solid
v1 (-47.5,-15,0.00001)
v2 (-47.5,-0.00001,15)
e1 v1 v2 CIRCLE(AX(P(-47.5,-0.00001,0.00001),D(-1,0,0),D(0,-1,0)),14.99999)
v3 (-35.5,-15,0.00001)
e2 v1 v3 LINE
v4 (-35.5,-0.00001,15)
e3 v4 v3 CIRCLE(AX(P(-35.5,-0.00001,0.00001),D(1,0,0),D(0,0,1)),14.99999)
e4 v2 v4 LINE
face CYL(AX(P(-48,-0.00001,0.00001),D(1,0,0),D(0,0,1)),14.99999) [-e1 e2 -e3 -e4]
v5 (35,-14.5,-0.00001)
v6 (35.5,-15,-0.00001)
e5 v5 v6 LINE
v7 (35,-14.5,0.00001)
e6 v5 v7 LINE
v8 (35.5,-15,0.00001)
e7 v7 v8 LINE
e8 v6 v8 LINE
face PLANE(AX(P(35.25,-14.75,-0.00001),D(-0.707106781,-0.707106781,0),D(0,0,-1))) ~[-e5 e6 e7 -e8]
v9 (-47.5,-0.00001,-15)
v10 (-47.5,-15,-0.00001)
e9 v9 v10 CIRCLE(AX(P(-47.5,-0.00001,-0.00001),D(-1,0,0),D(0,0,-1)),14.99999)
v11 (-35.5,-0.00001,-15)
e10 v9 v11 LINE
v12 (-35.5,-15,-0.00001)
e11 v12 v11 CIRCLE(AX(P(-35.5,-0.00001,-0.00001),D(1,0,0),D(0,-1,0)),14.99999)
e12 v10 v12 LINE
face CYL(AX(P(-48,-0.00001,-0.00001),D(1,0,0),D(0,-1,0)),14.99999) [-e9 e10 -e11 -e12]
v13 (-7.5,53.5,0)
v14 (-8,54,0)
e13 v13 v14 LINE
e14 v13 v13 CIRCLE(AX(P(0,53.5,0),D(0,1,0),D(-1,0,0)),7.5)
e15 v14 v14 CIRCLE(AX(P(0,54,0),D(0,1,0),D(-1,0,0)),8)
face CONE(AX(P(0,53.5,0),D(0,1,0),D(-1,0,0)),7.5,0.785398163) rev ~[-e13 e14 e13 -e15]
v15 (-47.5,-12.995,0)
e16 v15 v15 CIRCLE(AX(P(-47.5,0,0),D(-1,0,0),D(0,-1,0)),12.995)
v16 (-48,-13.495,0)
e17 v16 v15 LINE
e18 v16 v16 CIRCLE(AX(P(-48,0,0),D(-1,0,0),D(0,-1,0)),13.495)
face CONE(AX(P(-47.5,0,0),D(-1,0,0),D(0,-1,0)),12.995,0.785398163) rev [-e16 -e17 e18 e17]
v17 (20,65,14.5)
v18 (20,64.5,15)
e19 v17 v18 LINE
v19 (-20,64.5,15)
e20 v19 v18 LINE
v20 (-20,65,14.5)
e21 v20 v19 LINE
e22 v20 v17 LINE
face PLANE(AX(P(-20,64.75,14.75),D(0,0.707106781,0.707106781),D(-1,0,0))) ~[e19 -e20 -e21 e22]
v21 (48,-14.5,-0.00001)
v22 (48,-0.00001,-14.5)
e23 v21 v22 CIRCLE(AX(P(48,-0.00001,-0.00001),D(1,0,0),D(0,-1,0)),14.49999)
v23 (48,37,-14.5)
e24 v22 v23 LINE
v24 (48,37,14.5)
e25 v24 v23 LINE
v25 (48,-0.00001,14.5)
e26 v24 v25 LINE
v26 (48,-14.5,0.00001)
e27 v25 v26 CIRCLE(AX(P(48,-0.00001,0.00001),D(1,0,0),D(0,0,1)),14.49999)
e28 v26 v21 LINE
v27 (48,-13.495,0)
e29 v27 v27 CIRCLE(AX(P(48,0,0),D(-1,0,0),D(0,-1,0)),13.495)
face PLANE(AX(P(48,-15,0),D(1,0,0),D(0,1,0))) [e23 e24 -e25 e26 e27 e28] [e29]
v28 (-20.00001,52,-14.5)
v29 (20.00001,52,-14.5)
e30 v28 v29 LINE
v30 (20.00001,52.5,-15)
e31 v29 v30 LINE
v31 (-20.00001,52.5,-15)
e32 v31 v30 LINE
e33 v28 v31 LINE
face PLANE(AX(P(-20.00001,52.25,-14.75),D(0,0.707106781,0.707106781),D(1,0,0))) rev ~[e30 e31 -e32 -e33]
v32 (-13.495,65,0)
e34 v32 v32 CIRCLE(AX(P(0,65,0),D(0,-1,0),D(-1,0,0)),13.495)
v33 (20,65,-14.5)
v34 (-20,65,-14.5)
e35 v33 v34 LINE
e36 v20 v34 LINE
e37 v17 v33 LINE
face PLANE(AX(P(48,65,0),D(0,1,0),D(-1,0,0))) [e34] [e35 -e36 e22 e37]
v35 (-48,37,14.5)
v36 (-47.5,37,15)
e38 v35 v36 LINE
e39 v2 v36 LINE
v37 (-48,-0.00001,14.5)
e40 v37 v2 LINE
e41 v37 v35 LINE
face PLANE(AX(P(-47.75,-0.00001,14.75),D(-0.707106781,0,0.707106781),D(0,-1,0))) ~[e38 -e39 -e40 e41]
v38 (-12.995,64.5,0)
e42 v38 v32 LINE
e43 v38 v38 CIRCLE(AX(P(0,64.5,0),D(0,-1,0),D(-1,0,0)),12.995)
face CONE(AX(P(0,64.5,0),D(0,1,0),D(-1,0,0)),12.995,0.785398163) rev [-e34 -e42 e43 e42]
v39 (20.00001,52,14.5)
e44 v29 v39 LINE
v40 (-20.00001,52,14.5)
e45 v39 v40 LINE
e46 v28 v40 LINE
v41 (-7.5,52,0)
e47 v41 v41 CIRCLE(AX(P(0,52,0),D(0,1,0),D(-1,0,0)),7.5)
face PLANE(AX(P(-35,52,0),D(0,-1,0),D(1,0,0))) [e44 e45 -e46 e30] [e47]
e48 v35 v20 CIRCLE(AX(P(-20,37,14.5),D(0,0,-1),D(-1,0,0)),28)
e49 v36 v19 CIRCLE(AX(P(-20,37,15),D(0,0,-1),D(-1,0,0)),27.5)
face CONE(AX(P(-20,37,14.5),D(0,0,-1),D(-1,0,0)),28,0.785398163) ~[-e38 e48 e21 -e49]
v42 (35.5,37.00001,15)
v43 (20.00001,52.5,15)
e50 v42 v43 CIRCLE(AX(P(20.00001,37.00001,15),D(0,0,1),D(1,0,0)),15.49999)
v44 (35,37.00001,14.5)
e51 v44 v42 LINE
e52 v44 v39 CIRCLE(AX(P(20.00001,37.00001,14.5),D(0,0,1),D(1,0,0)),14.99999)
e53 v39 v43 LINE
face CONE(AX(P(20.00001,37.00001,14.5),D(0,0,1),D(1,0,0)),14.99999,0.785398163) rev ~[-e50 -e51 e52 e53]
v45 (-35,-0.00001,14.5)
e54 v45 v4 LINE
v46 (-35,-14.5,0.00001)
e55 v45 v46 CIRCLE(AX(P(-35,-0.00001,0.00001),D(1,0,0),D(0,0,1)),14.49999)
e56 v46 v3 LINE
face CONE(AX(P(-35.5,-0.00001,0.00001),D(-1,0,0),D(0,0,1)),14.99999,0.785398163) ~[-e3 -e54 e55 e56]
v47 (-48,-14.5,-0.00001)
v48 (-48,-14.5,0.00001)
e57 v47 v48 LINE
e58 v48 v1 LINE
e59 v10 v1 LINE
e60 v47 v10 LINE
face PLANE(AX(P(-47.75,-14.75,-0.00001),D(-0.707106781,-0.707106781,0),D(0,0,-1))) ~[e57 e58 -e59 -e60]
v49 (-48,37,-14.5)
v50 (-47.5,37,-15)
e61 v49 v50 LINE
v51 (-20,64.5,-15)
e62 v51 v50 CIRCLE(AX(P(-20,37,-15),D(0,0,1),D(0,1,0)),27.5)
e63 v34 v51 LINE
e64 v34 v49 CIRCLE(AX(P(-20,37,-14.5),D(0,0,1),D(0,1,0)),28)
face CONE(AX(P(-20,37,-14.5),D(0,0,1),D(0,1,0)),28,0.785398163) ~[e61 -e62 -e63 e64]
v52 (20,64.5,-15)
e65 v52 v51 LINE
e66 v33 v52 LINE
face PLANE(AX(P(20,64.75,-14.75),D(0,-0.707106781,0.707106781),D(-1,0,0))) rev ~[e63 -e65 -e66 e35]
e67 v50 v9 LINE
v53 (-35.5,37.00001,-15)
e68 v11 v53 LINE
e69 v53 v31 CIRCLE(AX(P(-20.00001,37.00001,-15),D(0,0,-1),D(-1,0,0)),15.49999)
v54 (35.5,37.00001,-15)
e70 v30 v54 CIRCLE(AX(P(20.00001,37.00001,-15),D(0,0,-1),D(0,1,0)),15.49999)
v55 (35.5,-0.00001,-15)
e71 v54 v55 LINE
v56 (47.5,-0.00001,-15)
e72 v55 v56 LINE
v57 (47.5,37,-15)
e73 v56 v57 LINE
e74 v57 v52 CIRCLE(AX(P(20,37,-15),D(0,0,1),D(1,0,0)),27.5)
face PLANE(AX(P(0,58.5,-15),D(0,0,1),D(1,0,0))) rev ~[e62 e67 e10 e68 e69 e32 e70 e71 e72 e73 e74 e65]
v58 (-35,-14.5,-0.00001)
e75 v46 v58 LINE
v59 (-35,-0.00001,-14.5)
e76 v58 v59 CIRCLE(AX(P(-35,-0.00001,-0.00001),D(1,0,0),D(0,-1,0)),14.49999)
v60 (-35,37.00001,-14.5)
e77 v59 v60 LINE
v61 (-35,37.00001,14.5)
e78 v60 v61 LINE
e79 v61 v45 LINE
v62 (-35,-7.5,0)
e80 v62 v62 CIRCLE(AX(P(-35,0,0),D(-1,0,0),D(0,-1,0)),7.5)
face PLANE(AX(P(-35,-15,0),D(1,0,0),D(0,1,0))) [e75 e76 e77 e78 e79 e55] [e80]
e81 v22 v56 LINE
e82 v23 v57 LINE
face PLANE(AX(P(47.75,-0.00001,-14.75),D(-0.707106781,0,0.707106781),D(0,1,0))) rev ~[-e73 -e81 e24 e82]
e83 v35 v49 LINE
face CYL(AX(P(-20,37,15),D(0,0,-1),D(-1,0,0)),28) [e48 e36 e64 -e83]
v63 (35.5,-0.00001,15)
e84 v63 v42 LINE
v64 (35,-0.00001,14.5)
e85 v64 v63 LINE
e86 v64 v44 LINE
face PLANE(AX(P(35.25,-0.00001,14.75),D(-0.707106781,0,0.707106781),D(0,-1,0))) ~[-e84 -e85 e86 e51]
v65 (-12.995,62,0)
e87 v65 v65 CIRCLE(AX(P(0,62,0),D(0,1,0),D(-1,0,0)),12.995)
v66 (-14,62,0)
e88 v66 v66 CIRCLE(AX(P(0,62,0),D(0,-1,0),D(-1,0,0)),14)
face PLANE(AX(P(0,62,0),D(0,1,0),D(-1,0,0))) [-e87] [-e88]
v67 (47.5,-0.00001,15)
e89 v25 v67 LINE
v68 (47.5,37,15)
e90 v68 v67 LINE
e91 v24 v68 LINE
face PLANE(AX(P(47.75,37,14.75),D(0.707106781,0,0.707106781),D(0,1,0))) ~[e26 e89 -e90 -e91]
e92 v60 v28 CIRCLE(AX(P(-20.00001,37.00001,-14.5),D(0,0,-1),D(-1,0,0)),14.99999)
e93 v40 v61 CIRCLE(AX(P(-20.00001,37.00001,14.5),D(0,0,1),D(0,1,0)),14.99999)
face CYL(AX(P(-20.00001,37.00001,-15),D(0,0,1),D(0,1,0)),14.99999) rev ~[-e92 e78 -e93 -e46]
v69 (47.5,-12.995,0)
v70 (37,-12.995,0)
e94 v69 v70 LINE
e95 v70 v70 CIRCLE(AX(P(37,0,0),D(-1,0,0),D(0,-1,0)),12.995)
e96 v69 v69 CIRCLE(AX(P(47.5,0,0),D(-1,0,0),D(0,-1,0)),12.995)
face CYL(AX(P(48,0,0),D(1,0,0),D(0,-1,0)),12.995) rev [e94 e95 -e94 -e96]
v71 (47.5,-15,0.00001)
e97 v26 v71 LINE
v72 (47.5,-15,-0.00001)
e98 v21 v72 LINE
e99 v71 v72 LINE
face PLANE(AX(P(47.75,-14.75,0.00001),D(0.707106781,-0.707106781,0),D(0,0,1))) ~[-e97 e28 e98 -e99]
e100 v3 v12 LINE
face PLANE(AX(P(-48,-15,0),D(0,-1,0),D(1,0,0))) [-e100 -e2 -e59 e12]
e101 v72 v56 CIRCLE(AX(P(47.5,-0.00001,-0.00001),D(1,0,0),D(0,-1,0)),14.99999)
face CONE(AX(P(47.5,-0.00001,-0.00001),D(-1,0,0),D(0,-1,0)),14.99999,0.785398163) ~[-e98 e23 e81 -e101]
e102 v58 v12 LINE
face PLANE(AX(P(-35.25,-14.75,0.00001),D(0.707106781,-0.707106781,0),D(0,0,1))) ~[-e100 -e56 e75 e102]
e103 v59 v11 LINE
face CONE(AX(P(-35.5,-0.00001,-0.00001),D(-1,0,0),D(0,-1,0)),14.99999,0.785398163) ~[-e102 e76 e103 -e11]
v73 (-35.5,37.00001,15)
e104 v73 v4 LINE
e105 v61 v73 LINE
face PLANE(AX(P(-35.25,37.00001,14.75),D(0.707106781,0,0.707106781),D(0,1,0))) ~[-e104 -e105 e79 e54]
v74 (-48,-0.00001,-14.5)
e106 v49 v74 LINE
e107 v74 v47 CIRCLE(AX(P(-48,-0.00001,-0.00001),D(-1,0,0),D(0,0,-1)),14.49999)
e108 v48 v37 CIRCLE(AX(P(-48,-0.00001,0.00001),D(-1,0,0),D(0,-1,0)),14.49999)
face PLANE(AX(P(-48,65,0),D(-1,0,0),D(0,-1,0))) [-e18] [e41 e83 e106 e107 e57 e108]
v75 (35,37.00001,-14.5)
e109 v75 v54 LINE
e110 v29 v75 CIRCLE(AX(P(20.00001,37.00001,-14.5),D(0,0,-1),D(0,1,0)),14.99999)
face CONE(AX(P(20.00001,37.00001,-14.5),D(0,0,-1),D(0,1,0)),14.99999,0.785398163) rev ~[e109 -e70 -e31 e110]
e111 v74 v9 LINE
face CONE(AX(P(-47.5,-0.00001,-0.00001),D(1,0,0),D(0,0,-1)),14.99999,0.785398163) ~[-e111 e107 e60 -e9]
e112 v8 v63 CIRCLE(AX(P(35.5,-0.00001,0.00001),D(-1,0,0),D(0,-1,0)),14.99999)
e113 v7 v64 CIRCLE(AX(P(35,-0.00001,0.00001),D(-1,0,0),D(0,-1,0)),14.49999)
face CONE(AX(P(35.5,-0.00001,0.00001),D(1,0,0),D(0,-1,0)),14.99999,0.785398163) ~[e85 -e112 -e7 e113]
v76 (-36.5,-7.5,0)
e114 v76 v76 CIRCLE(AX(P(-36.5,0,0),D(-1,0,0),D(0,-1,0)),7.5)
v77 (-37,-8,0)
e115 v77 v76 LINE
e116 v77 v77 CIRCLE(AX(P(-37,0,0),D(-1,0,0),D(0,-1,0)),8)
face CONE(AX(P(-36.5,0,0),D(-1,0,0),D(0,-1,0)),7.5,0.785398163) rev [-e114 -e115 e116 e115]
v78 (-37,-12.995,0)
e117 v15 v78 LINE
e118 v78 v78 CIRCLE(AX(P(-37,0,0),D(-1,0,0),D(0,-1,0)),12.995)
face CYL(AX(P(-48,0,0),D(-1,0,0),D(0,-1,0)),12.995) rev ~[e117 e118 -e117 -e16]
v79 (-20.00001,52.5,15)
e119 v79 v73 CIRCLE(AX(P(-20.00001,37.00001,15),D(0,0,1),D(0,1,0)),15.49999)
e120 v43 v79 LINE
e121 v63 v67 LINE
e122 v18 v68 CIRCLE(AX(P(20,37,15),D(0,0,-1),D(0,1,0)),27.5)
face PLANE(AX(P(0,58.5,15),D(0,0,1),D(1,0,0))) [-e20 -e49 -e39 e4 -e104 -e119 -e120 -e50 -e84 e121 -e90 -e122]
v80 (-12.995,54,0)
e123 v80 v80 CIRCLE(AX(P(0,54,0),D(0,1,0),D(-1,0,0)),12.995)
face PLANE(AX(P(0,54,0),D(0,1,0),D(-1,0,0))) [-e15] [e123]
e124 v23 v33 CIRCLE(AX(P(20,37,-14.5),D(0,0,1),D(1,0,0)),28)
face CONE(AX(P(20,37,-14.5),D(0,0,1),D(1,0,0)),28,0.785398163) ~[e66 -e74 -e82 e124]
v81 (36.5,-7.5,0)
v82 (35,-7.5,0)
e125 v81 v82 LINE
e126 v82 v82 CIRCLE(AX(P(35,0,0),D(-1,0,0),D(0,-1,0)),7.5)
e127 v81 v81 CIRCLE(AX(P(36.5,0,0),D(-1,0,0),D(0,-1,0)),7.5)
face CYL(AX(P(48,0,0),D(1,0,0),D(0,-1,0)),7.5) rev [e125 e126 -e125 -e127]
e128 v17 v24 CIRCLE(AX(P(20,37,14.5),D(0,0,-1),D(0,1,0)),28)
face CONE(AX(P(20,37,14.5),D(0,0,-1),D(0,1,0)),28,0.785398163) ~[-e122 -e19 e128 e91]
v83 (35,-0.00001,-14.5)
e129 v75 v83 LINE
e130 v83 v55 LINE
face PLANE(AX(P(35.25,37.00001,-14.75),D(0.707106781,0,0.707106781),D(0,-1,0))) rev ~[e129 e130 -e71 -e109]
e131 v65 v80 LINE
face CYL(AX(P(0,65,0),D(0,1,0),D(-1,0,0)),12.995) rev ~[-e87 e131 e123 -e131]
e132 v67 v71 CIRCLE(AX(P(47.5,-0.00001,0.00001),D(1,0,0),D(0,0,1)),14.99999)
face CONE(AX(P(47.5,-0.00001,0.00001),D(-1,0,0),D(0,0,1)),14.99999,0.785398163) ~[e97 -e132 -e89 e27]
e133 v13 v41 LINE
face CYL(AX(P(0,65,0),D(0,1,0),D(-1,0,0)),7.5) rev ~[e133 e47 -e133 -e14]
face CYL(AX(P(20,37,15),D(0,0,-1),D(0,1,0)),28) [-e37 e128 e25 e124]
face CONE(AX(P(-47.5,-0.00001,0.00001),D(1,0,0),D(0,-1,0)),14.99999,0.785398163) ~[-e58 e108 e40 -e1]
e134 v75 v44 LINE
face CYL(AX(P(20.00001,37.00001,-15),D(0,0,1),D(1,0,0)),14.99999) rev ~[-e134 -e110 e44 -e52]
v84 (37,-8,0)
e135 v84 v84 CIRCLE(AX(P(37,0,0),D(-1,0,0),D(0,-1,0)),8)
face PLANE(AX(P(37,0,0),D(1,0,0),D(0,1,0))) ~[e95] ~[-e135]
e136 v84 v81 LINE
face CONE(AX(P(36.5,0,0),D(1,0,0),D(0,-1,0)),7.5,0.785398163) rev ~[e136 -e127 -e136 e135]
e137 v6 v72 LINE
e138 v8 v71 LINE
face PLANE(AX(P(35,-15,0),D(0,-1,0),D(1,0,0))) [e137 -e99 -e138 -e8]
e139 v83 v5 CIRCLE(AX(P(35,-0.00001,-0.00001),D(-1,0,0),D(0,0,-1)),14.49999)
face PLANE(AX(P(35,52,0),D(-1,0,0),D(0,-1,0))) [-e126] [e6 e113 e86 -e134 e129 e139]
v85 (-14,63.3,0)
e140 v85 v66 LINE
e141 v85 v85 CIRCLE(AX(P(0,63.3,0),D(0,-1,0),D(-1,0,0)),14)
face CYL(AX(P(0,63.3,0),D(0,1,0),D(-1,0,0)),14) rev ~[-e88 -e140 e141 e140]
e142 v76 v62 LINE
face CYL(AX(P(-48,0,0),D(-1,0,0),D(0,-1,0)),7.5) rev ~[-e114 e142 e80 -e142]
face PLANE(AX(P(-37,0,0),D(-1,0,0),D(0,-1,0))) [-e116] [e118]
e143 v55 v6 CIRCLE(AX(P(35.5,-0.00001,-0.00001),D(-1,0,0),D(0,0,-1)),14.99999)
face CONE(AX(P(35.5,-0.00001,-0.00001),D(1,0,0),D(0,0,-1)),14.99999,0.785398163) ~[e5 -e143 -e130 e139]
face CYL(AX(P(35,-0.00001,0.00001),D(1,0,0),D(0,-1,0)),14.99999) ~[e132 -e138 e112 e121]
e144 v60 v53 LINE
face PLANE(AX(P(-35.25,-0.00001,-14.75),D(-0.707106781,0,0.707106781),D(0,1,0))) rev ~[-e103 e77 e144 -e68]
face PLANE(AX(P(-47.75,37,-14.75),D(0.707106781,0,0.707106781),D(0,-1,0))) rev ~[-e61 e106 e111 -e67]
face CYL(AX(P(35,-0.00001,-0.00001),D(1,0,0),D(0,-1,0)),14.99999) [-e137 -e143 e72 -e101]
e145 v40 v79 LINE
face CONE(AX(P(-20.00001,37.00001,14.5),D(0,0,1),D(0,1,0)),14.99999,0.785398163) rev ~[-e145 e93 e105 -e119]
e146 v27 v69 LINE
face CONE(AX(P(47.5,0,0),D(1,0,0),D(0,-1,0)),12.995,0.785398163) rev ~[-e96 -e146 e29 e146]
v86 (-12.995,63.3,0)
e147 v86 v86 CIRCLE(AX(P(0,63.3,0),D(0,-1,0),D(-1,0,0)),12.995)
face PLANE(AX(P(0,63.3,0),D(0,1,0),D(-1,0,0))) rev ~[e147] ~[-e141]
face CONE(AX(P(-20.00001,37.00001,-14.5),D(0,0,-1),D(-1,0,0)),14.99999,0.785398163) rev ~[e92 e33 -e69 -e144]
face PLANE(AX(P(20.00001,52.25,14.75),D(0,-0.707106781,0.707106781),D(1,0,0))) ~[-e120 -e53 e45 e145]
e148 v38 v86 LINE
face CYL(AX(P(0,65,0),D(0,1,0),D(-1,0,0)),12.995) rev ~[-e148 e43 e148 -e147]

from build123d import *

# Parameters (mm, degrees)
F0_W          = 30
F0_H          = 13
F0_W_2        = 13
F0_H_2        = 30
F1_DEPTH      = 15
F1_DEPTH_BACK = 15
F2_R          = 14.99999
F3_R          = 28
F4_R          = 12.995
F4_R_2        = 7.5
F5_DEPTH      = 11
F6_DEPTH      = 13
F7_R          = 12.995
F7_R_2        = 7.5
F8_DEPTH      = 11
F9_DEPTH      = 13
F10_START     = -1.7
F7_R_3        = 14
F10_DEPTH     = 1.3
F12_SIZE      = 0.5


# Not quite as in the source:
# - a fillet or chamfer is up to 0.001 mm smaller than in the source, because OpenCascade refuses the exact size


with BuildPart() as f1:
    # F0 (on Top) → F1 (new body, two sides)
    with BuildSketch(Plane.XY) as f1_sk:
        with Locations((0, 58.5)):
            Rectangle(F0_W, F0_H)
        Polygon((-48, 15), (-35, 15), (-35, 52), (-15, 52), (-15, 65), (-48, 65), align=None)
        with Locations((-41.5, 0)):
            Rectangle(F0_W_2, F0_H_2)
        Polygon((35, 52), (35, 15), (48, 15), (48, 65), (15, 65), (15, 52), align=None)
        with Locations((41.5, 0)):
            Rectangle(F0_W_2, F0_H_2)
    extrude(amount=F1_DEPTH)
    extrude(f1_sk.sketch, amount=-F1_DEPTH_BACK)

    # F2 (radius 15 in the source; OpenCascade refuses exactly that, so slightly less here)
    f2_edges = [f1.edges().sort_by_distance(p)[0] for p in [
        (-41.5, -15, 15),
        (-41.5, -15, -15),
        (41.5, -15, 15),
        (41.5, -15, -15),
        (-35, 52, 0),
        (35, 52, 0),
    ]]
    fillet(f2_edges, radius=F2_R)

    # F3
    f3_edges = [f1.edges().sort_by_distance(p)[0] for p in [
        (48, 65, 0),
        (-48, 65, 0),
    ]]
    fillet(f3_edges, radius=F3_R)

    # F4 (on face) → F5 (cut)
    with BuildSketch(Plane(origin=(-48, 0, 0), x_dir=(0, -1, 0), z_dir=(-1, 0, 0))):
        Circle(F4_R)
        Circle(F4_R_2, mode=Mode.SUBTRACT)
        Circle(F4_R_2)
    extrude(amount=-F5_DEPTH, mode=Mode.SUBTRACT)

    # F4 (on face) → F6 (cut)
    with BuildSketch(Plane(origin=(-48, 0, 0), x_dir=(0, -1, 0), z_dir=(-1, 0, 0))):
        Circle(F4_R_2)
    extrude(amount=-F6_DEPTH, mode=Mode.SUBTRACT)

    # F7 (on face) → F8 (cut)
    with BuildSketch(Plane(origin=(0, 65, 0), x_dir=(-1, 0, 0), z_dir=(0, 1, 0))):
        Circle(F7_R)
        Circle(F7_R_2, mode=Mode.SUBTRACT)
        Circle(F7_R_2)
    extrude(amount=-F8_DEPTH, mode=Mode.SUBTRACT)

    # F7 (on face) → F9 (cut)
    with BuildSketch(Plane(origin=(0, 65, 0), x_dir=(-1, 0, 0), z_dir=(0, 1, 0))):
        Circle(F7_R_2)
    extrude(amount=-F9_DEPTH, mode=Mode.SUBTRACT)

    # F7 (on face) → F10 (cut)
    with BuildSketch(Plane(origin=(0, 65, 0), x_dir=(-1, 0, 0), z_dir=(0, 1, 0)).offset(F10_START)):
        Circle(F7_R_3)
        Circle(F7_R, mode=Mode.SUBTRACT)
    extrude(amount=-F10_DEPTH, mode=Mode.SUBTRACT)

    # F11: F1 across plane


with BuildPart() as f1_1:
    add(f1.part)
    add(f1.part.mirror(Plane.YZ), mode=Mode.INTERSECT)

    # F12
    f12_edges = [f1_1.edges().sort_by_distance(p)[0] for p in [
        (-30.606605, 47.606605, 15),
        (0, 65, -15),
        (-48, 12.995, 0),
        (-37, 7.5, 0),
        (48, 12.995, 0),
        (37, 7.5, 0),
        (12.995, 65, 0),
        (7.5, 54, 0),
        (-48, 18.499995, 15),
        (-48, -10.606605, 10.606605),
        (-48, 18.499995, -15),
        (-48, -15, 0),
        (-48, -10.606605, -10.606605),
        (-35, 18.5, 15),
        (-35, -10.606605, 10.606605),
        (-35, -15, 0),
        (-35, 18.5, -15),
        (-35, -10.606605, -10.606605),
        (-30.606605, 47.606605, -15),
        (0, 52, 15),
        (0, 52, -15),
        (0, 65, 15),
        (39.79899, 56.79899, 15),
        (39.79899, 56.79899, -15),
        (48, 18.499995, 15),
        (48, -10.606605, 10.606605),
        (48, -15, 0),
        (48, 18.499995, -15),
        (48, -10.606605, -10.606605),
        (35, 18.5, 15),
        (35, -10.606605, 10.606605),
        (35, 18.5, -15),
        (35, -15, 0),
        (35, -10.606605, -10.606605),
        (30.606605, 47.606605, -15),
        (30.606605, 47.606605, 15),
        (-39.79899, 56.79899, -15),
        (-39.79899, 56.79899, 15),
    ]]
    chamfer(f12_edges, length=F12_SIZE)


solid = f1_1.part
